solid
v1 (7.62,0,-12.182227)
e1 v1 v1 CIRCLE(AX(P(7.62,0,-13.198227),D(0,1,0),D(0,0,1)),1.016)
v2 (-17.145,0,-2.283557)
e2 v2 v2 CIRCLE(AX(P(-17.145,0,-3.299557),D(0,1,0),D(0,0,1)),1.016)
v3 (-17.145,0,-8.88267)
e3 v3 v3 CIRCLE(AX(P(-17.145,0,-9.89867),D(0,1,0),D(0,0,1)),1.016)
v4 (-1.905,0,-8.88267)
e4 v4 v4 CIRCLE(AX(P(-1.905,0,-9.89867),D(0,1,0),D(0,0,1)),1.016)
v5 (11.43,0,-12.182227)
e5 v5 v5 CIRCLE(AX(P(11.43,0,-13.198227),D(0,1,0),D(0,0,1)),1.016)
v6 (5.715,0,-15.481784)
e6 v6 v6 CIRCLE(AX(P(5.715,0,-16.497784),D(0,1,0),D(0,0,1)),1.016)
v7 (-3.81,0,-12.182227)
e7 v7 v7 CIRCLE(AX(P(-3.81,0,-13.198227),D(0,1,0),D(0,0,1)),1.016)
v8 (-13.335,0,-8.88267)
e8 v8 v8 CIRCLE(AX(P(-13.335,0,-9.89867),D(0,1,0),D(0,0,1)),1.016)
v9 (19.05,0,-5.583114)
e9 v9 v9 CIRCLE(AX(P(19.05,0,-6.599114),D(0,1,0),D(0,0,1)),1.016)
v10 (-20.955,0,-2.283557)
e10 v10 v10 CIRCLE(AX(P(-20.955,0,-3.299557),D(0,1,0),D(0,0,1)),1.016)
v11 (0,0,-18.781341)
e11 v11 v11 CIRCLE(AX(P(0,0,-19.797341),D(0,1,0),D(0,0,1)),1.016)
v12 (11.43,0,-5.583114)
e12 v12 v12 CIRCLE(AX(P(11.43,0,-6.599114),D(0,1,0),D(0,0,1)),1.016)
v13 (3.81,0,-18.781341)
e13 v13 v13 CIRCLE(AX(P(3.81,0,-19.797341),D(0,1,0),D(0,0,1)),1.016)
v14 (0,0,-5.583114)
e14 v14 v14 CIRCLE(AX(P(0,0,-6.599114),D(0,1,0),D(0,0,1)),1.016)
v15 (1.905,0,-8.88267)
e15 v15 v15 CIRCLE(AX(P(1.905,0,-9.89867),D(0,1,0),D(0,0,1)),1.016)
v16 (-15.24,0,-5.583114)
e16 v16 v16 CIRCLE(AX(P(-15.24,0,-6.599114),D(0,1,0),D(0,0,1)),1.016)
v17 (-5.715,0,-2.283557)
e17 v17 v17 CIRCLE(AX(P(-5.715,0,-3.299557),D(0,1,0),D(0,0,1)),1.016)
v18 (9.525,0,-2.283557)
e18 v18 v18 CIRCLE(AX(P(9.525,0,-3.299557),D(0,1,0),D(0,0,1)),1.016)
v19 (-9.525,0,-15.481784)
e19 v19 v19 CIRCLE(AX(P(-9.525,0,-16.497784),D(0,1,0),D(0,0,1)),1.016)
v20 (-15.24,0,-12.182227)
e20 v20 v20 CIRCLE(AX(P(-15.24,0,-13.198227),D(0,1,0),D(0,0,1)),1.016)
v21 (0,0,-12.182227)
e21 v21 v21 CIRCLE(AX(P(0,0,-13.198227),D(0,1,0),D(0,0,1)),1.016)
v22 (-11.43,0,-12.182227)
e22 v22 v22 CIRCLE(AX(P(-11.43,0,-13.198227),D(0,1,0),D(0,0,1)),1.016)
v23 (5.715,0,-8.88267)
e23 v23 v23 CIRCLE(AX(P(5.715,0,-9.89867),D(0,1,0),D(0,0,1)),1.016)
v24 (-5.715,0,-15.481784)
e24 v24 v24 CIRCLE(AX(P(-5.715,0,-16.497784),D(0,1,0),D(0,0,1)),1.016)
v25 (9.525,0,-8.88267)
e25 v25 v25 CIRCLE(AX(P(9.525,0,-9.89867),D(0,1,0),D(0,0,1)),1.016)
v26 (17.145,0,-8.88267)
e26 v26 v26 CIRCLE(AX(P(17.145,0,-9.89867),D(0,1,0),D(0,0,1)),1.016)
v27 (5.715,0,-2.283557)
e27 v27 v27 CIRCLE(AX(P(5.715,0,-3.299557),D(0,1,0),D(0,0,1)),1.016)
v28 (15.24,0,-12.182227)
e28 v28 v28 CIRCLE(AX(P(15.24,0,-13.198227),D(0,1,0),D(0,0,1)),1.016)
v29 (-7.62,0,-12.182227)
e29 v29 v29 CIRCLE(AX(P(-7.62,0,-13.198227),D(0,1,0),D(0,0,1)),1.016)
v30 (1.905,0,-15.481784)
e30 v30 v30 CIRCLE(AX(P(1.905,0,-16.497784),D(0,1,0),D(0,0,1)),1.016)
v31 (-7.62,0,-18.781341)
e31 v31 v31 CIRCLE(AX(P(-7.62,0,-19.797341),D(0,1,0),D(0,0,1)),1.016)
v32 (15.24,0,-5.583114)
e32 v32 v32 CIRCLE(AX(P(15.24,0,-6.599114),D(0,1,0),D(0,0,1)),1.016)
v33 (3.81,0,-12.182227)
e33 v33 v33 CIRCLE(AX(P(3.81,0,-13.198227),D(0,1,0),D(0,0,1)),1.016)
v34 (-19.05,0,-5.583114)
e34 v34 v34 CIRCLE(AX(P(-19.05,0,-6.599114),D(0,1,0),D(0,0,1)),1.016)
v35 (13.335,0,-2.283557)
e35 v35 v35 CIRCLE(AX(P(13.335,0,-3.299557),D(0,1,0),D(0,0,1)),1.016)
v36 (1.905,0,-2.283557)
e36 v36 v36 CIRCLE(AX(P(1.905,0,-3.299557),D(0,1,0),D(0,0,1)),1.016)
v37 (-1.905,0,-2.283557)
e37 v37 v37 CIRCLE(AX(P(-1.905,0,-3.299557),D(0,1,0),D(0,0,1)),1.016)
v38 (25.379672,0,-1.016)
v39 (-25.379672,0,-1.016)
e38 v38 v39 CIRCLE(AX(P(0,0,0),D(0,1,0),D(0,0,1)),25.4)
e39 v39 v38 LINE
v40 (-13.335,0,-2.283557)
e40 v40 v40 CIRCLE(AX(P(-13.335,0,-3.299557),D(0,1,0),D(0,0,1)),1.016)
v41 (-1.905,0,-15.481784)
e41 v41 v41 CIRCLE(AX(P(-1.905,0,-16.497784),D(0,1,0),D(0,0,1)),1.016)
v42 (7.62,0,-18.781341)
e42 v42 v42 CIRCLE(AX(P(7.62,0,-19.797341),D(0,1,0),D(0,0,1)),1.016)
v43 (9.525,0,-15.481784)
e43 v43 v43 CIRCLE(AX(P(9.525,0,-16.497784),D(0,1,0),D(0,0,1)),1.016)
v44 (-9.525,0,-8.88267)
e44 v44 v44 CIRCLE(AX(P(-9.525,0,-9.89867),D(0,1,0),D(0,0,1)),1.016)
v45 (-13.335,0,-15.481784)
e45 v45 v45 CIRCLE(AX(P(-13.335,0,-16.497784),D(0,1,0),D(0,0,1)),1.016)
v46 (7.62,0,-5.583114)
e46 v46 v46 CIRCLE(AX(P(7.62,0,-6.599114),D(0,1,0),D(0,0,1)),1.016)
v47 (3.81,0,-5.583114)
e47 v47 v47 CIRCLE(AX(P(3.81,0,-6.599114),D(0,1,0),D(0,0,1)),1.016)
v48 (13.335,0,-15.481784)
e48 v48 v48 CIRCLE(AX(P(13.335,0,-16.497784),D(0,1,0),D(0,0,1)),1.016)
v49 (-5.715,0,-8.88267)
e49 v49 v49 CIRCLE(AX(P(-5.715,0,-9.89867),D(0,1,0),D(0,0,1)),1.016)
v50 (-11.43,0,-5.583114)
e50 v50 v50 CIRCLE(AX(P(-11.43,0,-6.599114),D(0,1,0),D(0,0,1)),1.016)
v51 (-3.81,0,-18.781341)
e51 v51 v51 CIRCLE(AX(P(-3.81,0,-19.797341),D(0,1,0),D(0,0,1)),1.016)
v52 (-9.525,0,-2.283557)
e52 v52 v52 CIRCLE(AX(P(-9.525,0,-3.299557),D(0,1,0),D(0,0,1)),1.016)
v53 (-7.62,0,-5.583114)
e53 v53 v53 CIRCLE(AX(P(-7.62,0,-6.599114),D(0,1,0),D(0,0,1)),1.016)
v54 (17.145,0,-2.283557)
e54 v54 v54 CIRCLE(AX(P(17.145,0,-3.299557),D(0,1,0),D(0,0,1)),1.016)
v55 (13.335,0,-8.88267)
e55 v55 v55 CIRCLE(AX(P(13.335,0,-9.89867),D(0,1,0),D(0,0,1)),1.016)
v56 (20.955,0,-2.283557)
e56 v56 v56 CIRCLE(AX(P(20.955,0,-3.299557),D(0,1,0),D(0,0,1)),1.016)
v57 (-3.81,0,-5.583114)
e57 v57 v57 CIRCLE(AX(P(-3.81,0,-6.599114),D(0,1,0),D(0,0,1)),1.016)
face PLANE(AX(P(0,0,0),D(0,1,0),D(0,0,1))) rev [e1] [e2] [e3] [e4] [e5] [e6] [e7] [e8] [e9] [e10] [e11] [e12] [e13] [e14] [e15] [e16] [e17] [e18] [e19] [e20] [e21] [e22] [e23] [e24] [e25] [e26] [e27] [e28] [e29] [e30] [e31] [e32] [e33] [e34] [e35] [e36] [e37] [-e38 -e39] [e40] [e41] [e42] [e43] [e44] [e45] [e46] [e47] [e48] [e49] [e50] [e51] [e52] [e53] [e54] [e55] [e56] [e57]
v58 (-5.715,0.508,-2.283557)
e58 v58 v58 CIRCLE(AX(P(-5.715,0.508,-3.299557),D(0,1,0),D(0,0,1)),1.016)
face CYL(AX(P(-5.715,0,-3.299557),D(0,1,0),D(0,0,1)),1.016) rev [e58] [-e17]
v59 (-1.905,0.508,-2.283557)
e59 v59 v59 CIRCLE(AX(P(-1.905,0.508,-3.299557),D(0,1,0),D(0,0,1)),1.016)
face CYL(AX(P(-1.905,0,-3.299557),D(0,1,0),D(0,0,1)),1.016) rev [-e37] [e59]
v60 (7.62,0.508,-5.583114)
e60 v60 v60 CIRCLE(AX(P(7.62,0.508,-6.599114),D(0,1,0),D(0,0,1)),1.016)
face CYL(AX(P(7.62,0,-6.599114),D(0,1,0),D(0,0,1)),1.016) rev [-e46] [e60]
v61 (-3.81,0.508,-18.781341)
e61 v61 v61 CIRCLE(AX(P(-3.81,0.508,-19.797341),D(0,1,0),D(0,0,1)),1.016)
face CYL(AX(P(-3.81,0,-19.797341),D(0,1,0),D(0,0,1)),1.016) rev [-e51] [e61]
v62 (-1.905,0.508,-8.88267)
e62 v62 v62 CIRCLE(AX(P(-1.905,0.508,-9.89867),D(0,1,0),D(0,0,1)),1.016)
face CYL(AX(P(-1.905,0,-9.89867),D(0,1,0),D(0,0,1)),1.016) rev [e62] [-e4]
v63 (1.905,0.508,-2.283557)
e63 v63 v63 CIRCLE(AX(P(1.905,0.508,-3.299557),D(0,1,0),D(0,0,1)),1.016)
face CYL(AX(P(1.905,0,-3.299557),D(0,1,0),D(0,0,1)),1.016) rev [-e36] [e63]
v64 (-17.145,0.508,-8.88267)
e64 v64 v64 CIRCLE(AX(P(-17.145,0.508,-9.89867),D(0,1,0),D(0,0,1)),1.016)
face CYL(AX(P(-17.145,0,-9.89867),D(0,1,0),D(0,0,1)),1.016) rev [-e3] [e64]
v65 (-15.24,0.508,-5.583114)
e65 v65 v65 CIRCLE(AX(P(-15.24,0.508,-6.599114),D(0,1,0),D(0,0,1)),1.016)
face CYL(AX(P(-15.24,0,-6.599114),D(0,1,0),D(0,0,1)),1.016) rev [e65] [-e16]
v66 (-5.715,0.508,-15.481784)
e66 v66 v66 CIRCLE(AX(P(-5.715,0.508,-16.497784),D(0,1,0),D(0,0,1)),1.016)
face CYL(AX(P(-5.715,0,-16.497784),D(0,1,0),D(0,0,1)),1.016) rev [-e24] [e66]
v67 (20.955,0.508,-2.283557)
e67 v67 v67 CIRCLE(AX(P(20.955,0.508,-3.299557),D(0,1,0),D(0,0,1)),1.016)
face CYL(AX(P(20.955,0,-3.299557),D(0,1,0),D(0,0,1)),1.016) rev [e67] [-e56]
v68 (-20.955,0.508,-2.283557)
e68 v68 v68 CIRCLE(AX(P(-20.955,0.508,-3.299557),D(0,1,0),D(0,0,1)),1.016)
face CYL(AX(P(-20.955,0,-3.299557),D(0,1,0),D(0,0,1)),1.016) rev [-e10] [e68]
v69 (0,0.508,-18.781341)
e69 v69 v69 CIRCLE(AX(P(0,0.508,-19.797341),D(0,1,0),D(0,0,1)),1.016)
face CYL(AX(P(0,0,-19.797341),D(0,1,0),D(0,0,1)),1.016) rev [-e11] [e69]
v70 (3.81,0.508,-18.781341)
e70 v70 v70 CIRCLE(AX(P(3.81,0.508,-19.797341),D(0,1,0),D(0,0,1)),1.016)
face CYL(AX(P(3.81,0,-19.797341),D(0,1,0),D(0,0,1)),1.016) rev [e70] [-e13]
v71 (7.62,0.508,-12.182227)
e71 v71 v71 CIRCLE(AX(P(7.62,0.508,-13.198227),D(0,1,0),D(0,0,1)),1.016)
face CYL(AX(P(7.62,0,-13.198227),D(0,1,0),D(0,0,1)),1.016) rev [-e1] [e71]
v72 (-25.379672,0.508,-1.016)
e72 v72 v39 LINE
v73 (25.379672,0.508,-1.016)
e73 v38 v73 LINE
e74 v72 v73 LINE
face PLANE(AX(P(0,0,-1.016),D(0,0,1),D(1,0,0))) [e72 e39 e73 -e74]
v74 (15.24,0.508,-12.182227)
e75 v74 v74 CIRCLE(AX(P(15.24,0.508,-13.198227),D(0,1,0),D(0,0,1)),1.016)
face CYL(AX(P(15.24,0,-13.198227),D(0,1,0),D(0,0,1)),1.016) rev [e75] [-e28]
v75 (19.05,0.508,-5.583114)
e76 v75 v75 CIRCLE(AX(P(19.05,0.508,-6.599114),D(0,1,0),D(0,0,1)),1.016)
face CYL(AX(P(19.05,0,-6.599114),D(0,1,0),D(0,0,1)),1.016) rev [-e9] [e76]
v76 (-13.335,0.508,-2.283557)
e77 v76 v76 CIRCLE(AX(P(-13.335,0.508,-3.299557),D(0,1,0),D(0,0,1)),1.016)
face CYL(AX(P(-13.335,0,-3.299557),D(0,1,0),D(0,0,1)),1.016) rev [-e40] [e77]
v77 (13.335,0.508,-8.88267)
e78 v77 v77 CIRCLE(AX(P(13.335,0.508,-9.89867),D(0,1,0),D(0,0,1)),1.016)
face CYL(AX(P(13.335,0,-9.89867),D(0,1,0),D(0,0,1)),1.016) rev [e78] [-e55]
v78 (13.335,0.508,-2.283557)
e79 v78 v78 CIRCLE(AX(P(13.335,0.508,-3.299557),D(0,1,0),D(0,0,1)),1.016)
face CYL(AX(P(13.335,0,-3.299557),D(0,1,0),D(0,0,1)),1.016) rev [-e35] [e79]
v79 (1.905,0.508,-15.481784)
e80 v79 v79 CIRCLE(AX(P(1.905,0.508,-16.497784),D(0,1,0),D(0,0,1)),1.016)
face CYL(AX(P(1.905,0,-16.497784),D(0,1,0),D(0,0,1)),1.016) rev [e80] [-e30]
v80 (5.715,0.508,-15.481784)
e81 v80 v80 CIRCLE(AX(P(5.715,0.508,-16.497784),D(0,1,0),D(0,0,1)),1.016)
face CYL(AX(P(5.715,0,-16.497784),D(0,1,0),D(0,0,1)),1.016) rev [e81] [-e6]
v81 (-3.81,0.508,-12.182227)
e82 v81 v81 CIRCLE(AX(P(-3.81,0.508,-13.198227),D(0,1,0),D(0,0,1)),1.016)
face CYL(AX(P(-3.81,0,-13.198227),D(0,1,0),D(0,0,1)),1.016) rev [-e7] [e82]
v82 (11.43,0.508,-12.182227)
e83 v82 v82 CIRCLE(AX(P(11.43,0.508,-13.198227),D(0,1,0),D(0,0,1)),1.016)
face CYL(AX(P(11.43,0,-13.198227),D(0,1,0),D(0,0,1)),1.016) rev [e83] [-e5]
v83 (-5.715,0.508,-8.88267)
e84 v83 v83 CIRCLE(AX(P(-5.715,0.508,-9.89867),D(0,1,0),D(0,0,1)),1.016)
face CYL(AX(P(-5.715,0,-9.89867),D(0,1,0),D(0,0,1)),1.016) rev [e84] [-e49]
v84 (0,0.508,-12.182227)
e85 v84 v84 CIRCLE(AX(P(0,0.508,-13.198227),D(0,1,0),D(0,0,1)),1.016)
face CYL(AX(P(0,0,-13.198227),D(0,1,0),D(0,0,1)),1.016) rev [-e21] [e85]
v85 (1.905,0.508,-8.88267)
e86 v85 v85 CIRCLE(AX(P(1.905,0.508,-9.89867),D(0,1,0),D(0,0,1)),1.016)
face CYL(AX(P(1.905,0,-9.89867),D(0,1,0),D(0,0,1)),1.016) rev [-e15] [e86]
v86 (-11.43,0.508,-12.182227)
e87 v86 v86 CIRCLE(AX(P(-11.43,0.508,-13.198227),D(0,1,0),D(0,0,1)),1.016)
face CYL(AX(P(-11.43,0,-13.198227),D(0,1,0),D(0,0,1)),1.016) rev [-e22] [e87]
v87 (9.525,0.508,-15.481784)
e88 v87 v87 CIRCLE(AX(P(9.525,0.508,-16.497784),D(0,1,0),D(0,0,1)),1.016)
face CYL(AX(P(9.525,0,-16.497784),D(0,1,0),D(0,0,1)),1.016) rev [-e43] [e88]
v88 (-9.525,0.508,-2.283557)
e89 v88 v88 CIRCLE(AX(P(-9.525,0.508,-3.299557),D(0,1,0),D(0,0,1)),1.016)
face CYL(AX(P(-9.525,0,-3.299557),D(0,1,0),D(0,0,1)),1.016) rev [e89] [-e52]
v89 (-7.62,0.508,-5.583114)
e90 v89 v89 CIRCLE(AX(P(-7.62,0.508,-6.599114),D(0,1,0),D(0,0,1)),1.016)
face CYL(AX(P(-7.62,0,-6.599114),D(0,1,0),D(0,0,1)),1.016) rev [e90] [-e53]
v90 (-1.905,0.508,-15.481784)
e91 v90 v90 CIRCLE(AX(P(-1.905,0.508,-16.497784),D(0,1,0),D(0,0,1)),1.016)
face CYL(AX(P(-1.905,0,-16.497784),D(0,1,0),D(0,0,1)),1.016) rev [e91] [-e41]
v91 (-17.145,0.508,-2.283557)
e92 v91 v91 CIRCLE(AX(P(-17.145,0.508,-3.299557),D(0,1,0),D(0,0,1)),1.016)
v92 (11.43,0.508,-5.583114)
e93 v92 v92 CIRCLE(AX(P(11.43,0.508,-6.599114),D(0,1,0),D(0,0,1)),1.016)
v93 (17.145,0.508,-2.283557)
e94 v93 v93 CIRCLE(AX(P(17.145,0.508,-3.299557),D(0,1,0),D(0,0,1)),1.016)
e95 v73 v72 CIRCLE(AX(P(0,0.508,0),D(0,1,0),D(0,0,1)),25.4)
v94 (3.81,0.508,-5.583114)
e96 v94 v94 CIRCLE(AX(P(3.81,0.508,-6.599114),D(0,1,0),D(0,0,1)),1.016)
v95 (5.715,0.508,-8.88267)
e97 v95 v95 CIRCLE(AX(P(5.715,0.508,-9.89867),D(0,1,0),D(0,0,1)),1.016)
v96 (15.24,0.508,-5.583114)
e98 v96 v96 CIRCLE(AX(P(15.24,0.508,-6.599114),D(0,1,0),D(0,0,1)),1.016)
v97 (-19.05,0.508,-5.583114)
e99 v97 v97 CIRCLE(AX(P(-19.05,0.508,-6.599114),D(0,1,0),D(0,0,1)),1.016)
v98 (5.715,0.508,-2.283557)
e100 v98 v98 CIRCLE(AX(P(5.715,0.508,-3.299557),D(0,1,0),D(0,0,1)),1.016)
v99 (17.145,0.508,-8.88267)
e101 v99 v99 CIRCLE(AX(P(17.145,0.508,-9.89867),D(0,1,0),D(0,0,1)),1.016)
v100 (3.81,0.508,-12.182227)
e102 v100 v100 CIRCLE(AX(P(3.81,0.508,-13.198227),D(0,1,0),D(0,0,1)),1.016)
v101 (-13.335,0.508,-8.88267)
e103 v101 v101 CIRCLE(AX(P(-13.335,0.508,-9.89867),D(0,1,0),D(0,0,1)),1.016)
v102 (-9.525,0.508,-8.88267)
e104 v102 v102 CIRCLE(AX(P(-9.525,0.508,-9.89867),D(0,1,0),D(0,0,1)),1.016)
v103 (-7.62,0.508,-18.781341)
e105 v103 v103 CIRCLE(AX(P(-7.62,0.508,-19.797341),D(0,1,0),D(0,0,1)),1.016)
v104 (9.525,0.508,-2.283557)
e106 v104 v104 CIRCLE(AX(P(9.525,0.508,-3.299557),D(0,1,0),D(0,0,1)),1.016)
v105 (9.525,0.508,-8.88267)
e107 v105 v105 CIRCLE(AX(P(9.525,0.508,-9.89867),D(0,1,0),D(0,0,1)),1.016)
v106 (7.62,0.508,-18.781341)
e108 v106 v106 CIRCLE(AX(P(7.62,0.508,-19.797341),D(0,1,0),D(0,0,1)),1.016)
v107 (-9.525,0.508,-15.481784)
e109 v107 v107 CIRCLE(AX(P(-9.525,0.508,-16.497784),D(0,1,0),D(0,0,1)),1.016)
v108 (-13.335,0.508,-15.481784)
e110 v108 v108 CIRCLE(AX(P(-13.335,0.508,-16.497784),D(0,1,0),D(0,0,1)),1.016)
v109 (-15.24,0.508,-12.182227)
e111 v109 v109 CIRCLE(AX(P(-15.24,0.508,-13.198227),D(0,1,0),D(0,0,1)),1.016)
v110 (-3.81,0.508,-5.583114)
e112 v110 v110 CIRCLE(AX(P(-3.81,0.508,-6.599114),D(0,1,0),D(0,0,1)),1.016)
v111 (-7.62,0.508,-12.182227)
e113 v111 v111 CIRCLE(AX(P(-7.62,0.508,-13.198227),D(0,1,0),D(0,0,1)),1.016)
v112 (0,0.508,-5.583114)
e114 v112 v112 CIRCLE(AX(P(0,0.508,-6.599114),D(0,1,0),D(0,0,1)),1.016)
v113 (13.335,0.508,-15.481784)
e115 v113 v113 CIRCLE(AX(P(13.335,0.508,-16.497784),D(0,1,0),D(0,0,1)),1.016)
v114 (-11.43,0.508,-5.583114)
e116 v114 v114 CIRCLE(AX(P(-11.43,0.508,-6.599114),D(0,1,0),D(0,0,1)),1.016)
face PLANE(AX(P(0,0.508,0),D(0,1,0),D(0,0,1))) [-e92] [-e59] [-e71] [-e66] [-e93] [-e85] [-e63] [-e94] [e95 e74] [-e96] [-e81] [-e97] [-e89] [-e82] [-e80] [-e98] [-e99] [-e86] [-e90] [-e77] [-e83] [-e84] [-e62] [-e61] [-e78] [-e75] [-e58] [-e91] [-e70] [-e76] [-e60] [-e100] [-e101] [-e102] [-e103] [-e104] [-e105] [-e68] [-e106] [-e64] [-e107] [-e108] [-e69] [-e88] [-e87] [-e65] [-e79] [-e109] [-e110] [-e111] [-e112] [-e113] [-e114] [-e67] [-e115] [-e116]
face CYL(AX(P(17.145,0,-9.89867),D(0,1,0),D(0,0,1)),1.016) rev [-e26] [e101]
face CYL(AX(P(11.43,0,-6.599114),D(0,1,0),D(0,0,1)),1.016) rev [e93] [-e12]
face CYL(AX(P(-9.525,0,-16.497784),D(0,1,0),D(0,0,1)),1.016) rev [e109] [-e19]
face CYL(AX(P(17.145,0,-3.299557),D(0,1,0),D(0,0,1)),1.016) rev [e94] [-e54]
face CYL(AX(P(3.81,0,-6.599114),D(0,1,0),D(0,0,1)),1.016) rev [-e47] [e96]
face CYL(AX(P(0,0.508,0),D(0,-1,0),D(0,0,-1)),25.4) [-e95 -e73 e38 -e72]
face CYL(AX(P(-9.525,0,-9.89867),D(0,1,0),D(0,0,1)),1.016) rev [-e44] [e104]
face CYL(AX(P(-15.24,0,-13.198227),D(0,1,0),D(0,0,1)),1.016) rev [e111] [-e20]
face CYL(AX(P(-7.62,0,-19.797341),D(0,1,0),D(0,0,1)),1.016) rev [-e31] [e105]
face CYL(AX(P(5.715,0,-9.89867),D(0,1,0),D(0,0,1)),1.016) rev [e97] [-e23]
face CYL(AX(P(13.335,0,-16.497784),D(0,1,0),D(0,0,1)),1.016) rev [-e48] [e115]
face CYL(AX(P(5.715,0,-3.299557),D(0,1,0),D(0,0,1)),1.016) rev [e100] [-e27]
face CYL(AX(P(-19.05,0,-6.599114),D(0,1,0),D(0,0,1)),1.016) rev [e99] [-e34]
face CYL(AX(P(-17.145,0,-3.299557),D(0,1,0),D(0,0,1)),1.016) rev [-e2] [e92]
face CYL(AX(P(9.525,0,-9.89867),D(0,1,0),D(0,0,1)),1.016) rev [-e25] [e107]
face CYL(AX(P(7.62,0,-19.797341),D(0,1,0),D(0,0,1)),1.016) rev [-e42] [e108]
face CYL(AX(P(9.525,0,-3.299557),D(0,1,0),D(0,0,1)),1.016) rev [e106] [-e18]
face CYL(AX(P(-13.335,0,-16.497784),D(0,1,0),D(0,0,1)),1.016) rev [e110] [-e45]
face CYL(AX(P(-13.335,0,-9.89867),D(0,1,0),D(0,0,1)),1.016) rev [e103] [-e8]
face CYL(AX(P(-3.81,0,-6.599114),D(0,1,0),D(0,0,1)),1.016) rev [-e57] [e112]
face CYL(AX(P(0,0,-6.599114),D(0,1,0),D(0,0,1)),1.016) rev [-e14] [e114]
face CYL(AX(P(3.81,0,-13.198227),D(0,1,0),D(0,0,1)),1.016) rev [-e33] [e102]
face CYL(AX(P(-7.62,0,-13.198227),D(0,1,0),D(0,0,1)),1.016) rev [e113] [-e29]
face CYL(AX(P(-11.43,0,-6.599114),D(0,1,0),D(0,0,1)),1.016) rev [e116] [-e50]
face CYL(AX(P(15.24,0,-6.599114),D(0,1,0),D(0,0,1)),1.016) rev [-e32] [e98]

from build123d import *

# Parameters (mm, degrees)
SKETCH2_R               = 25.4
BOSS_EXTRUDE1_DEPTH     = 0.508
SKETCH3_R               = 1.016
CUT_EXTRUDE2_DEPTH      = 36.924616407
FILL_PATTERN1_OUTLINE_R = 1.016
FILL_PATTERN1_DEPTH     = 0.508
SKETCH7_W               = 63.5
SKETCH7_H               = 31.75
CUT_EXTRUDE5_DEPTH      = 36.924616407


# Read off the part's stored shape, not the designer's step: Fill Pattern1
with BuildPart() as part:
    # Sketch2 → Boss-Extrude1 (new body)
    with BuildSketch(Plane(origin=(0, 0, 0), x_dir=(1, 0, 0), z_dir=(0, 1, 0))):
        with Locations(Location((0, 0, 0), (0, 0, 270))):
            Circle(SKETCH2_R)
    extrude(amount=BOSS_EXTRUDE1_DEPTH)

    # Sketch3 → Cut-Extrude2 (cut, through all)
    with BuildSketch(Plane(origin=(0, 0.508, 0), x_dir=(1, 0, 0), z_dir=(0, 1, 0))):
        with Locations(Location((0, 0, 0), (0, 0, 270))):
            Circle(SKETCH3_R)
    extrude(amount=-CUT_EXTRUDE2_DEPTH, mode=Mode.SUBTRACT)

    # Fill Pattern1 outline → Fill Pattern1 (cut)
    with BuildSketch(Plane(origin=(0, 0, 0), x_dir=(1, 0, 0), z_dir=(0, 1, 0))):
        with Locations((20.955, -3.299556788)):
            Circle(FILL_PATTERN1_OUTLINE_R)
        with Locations((-11.43, -6.599113577)):
            Circle(FILL_PATTERN1_OUTLINE_R)
        with Locations((-13.335, -9.898670365)):
            Circle(FILL_PATTERN1_OUTLINE_R)
        with Locations((-15.24, -13.198227154)):
            Circle(FILL_PATTERN1_OUTLINE_R)
        with Locations((0, 19.797340731)):
            Circle(FILL_PATTERN1_OUTLINE_R)
        with Locations((-9.525, -3.299556788)):
            Circle(FILL_PATTERN1_OUTLINE_R)
        with Locations((-7.62, 0)):
            Circle(FILL_PATTERN1_OUTLINE_R)
        with Locations((-5.715, 3.299556788)):
            Circle(FILL_PATTERN1_OUTLINE_R)
        with Locations((-3.81, 6.599113577)):
            Circle(FILL_PATTERN1_OUTLINE_R)
        with Locations((-1.905, 16.497783942)):
            Circle(FILL_PATTERN1_OUTLINE_R)
        with Locations((-3.81, 13.198227154)):
            Circle(FILL_PATTERN1_OUTLINE_R)
        with Locations((-5.715, 9.898670365)):
            Circle(FILL_PATTERN1_OUTLINE_R)
        with Locations((-7.62, 6.599113577)):
            Circle(FILL_PATTERN1_OUTLINE_R)
        with Locations((-9.525, 3.299556788)):
            Circle(FILL_PATTERN1_OUTLINE_R)
        with Locations((-11.43, 0)):
            Circle(FILL_PATTERN1_OUTLINE_R)
        with Locations((-13.335, -3.299556788)):
            Circle(FILL_PATTERN1_OUTLINE_R)
        with Locations((-15.24, -6.599113577)):
            Circle(FILL_PATTERN1_OUTLINE_R)
        with Locations((7.62, 19.797340731)):
            Circle(FILL_PATTERN1_OUTLINE_R)
        with Locations((5.715, 16.497783942)):
            Circle(FILL_PATTERN1_OUTLINE_R)
        with Locations((3.81, 13.198227154)):
            Circle(FILL_PATTERN1_OUTLINE_R)
        with Locations((1.905, 9.898670365)):
            Circle(FILL_PATTERN1_OUTLINE_R)
        with Locations((0, 6.599113577)):
            Circle(FILL_PATTERN1_OUTLINE_R)
        with Locations((-1.905, 3.299556788)):
            Circle(FILL_PATTERN1_OUTLINE_R)
        with Locations((-3.81, 0)):
            Circle(FILL_PATTERN1_OUTLINE_R)
        with Locations((-5.715, -3.299556788)):
            Circle(FILL_PATTERN1_OUTLINE_R)
        with Locations((-7.62, -6.599113577)):
            Circle(FILL_PATTERN1_OUTLINE_R)
        with Locations((-9.525, -9.898670365)):
            Circle(FILL_PATTERN1_OUTLINE_R)
        with Locations((-11.43, -13.198227154)):
            Circle(FILL_PATTERN1_OUTLINE_R)
        with Locations((-13.335, -16.497783942)):
            Circle(FILL_PATTERN1_OUTLINE_R)
        with Locations((3.81, 19.797340731)):
            Circle(FILL_PATTERN1_OUTLINE_R)
        with Locations((1.905, 16.497783942)):
            Circle(FILL_PATTERN1_OUTLINE_R)
        with Locations((0, 13.198227154)):
            Circle(FILL_PATTERN1_OUTLINE_R)
        with Locations((-1.905, 9.898670365)):
            Circle(FILL_PATTERN1_OUTLINE_R)
        with Locations((-19.05, 0)):
            Circle(FILL_PATTERN1_OUTLINE_R)
        with Locations((-20.955, -3.299556788)):
            Circle(FILL_PATTERN1_OUTLINE_R)
        with Locations((-13.335, 16.497783942)):
            Circle(FILL_PATTERN1_OUTLINE_R)
        with Locations((-15.24, 13.198227154)):
            Circle(FILL_PATTERN1_OUTLINE_R)
        with Locations((-17.145, 9.898670365)):
            Circle(FILL_PATTERN1_OUTLINE_R)
        with Locations((-19.05, 6.599113577)):
            Circle(FILL_PATTERN1_OUTLINE_R)
        with Locations((-20.955, 3.299556788)):
            Circle(FILL_PATTERN1_OUTLINE_R)
        with Locations((-15.24, 0)):
            Circle(FILL_PATTERN1_OUTLINE_R)
        with Locations((-13.335, 3.299556788)):
            Circle(FILL_PATTERN1_OUTLINE_R)
        with Locations((-11.43, 6.599113577)):
            Circle(FILL_PATTERN1_OUTLINE_R)
        with Locations((-9.525, 9.898670365)):
            Circle(FILL_PATTERN1_OUTLINE_R)
        with Locations((-17.145, -9.898670365)):
            Circle(FILL_PATTERN1_OUTLINE_R)
        with Locations((-3.81, 19.797340731)):
            Circle(FILL_PATTERN1_OUTLINE_R)
        with Locations((-5.715, 16.497783942)):
            Circle(FILL_PATTERN1_OUTLINE_R)
        with Locations((-7.62, 13.198227154)):
            Circle(FILL_PATTERN1_OUTLINE_R)
        with Locations((-17.145, 3.299556788)):
            Circle(FILL_PATTERN1_OUTLINE_R)
        with Locations((-15.24, 6.599113577)):
            Circle(FILL_PATTERN1_OUTLINE_R)
        with Locations((-13.335, 9.898670365)):
            Circle(FILL_PATTERN1_OUTLINE_R)
        with Locations((-11.43, 13.198227154)):
            Circle(FILL_PATTERN1_OUTLINE_R)
        with Locations((-9.525, 16.497783942)):
            Circle(FILL_PATTERN1_OUTLINE_R)
        with Locations((-7.62, 19.797340731)):
            Circle(FILL_PATTERN1_OUTLINE_R)
        with Locations((-19.05, -6.599113577)):
            Circle(FILL_PATTERN1_OUTLINE_R)
        with Locations((-17.145, -3.299556788)):
            Circle(FILL_PATTERN1_OUTLINE_R)
        with Locations((3.81, -19.797340731)):
            Circle(FILL_PATTERN1_OUTLINE_R)
        with Locations((17.145, 9.898670365)):
            Circle(FILL_PATTERN1_OUTLINE_R)
        with Locations((15.24, 6.599113577)):
            Circle(FILL_PATTERN1_OUTLINE_R)
        with Locations((13.335, 3.299556788)):
            Circle(FILL_PATTERN1_OUTLINE_R)
        with Locations((5.715, -16.497783942)):
            Circle(FILL_PATTERN1_OUTLINE_R)
        with Locations((7.62, -13.198227154)):
            Circle(FILL_PATTERN1_OUTLINE_R)
        with Locations((9.525, -9.898670365)):
            Circle(FILL_PATTERN1_OUTLINE_R)
        with Locations((11.43, -6.599113577)):
            Circle(FILL_PATTERN1_OUTLINE_R)
        with Locations((3.81, -13.198227154)):
            Circle(FILL_PATTERN1_OUTLINE_R)
        with Locations((1.905, -16.497783942)):
            Circle(FILL_PATTERN1_OUTLINE_R)
        with Locations((0, -19.797340731)):
            Circle(FILL_PATTERN1_OUTLINE_R)
        with Locations((15.24, 13.198227154)):
            Circle(FILL_PATTERN1_OUTLINE_R)
        with Locations((5.715, -9.898670365)):
            Circle(FILL_PATTERN1_OUTLINE_R)
        with Locations((7.62, -6.599113577)):
            Circle(FILL_PATTERN1_OUTLINE_R)
        with Locations((9.525, -3.299556788)):
            Circle(FILL_PATTERN1_OUTLINE_R)
        with Locations((11.43, 0)):
            Circle(FILL_PATTERN1_OUTLINE_R)
        with Locations((15.24, -6.599113577)):
            Circle(FILL_PATTERN1_OUTLINE_R)
        with Locations((17.145, -3.299556788)):
            Circle(FILL_PATTERN1_OUTLINE_R)
        with Locations((19.05, 0)):
            Circle(FILL_PATTERN1_OUTLINE_R)
        with Locations((20.955, 3.299556788)):
            Circle(FILL_PATTERN1_OUTLINE_R)
        with Locations((13.335, -16.497783942)):
            Circle(FILL_PATTERN1_OUTLINE_R)
        with Locations((15.24, -13.198227154)):
            Circle(FILL_PATTERN1_OUTLINE_R)
        with Locations((17.145, -9.898670365)):
            Circle(FILL_PATTERN1_OUTLINE_R)
        with Locations((19.05, -6.599113577)):
            Circle(FILL_PATTERN1_OUTLINE_R)
        with Locations((13.335, -9.898670365)):
            Circle(FILL_PATTERN1_OUTLINE_R)
        with Locations((11.43, -13.198227154)):
            Circle(FILL_PATTERN1_OUTLINE_R)
        with Locations((9.525, -16.497783942)):
            Circle(FILL_PATTERN1_OUTLINE_R)
        with Locations((7.62, -19.797340731)):
            Circle(FILL_PATTERN1_OUTLINE_R)
        with Locations((19.05, 6.599113577)):
            Circle(FILL_PATTERN1_OUTLINE_R)
        with Locations((17.145, 3.299556788)):
            Circle(FILL_PATTERN1_OUTLINE_R)
        with Locations((15.24, 0)):
            Circle(FILL_PATTERN1_OUTLINE_R)
        with Locations((13.335, -3.299556788)):
            Circle(FILL_PATTERN1_OUTLINE_R)
        with Locations((7.62, 13.198227154)):
            Circle(FILL_PATTERN1_OUTLINE_R)
        with Locations((9.525, 16.497783942)):
            Circle(FILL_PATTERN1_OUTLINE_R)
        with Locations((-7.62, -19.797340731)):
            Circle(FILL_PATTERN1_OUTLINE_R)
        with Locations((-5.715, -16.497783942)):
            Circle(FILL_PATTERN1_OUTLINE_R)
        with Locations((-3.81, -13.198227154)):
            Circle(FILL_PATTERN1_OUTLINE_R)
        with Locations((-1.905, -9.898670365)):
            Circle(FILL_PATTERN1_OUTLINE_R)
        with Locations((0, -6.599113577)):
            Circle(FILL_PATTERN1_OUTLINE_R)
        with Locations((1.905, -3.299556788)):
            Circle(FILL_PATTERN1_OUTLINE_R)
        with Locations((5.715, 9.898670365)):
            Circle(FILL_PATTERN1_OUTLINE_R)
        with Locations((3.81, 6.599113577)):
            Circle(FILL_PATTERN1_OUTLINE_R)
        with Locations((1.905, 3.299556788)):
            Circle(FILL_PATTERN1_OUTLINE_R)
        with Locations((-1.905, -3.299556788)):
            Circle(FILL_PATTERN1_OUTLINE_R)
        with Locations((-3.81, -6.599113577)):
            Circle(FILL_PATTERN1_OUTLINE_R)
        with Locations((-5.715, -9.898670365)):
            Circle(FILL_PATTERN1_OUTLINE_R)
        with Locations((-7.62, -13.198227154)):
            Circle(FILL_PATTERN1_OUTLINE_R)
        with Locations((-9.525, -16.497783942)):
            Circle(FILL_PATTERN1_OUTLINE_R)
        with Locations((13.335, 9.898670365)):
            Circle(FILL_PATTERN1_OUTLINE_R)
        with Locations((11.43, 6.599113577)):
            Circle(FILL_PATTERN1_OUTLINE_R)
        with Locations((9.525, 3.299556788)):
            Circle(FILL_PATTERN1_OUTLINE_R)
        with Locations((7.62, 0)):
            Circle(FILL_PATTERN1_OUTLINE_R)
        with Locations((5.715, -3.299556788)):
            Circle(FILL_PATTERN1_OUTLINE_R)
        with Locations((3.81, -6.599113577)):
            Circle(FILL_PATTERN1_OUTLINE_R)
        with Locations((1.905, -9.898670365)):
            Circle(FILL_PATTERN1_OUTLINE_R)
        with Locations((0, -13.198227154)):
            Circle(FILL_PATTERN1_OUTLINE_R)
        with Locations((3.81, 0)):
            Circle(FILL_PATTERN1_OUTLINE_R)
        with Locations((5.715, 3.299556788)):
            Circle(FILL_PATTERN1_OUTLINE_R)
        with Locations((7.62, 6.599113577)):
            Circle(FILL_PATTERN1_OUTLINE_R)
        with Locations((9.525, 9.898670365)):
            Circle(FILL_PATTERN1_OUTLINE_R)
        with Locations((11.43, 13.198227154)):
            Circle(FILL_PATTERN1_OUTLINE_R)
        with Locations((13.335, 16.497783942)):
            Circle(FILL_PATTERN1_OUTLINE_R)
        with Locations((-3.81, -19.797340731)):
            Circle(FILL_PATTERN1_OUTLINE_R)
        with Locations((-1.905, -16.497783942)):
            Circle(FILL_PATTERN1_OUTLINE_R)
    extrude(amount=FILL_PATTERN1_DEPTH, mode=Mode.SUBTRACT)

    # Sketch7 → Cut-Extrude5 (cut, through all)
    with BuildSketch(Plane(origin=(0, 0.508, 0), x_dir=(1, 0, 0), z_dir=(0, 1, 0))):
        with Locations((0, -14.859)):
            Rectangle(SKETCH7_W, SKETCH7_H)
    extrude(amount=-CUT_EXTRUDE5_DEPTH, mode=Mode.SUBTRACT)


solid = part.part
